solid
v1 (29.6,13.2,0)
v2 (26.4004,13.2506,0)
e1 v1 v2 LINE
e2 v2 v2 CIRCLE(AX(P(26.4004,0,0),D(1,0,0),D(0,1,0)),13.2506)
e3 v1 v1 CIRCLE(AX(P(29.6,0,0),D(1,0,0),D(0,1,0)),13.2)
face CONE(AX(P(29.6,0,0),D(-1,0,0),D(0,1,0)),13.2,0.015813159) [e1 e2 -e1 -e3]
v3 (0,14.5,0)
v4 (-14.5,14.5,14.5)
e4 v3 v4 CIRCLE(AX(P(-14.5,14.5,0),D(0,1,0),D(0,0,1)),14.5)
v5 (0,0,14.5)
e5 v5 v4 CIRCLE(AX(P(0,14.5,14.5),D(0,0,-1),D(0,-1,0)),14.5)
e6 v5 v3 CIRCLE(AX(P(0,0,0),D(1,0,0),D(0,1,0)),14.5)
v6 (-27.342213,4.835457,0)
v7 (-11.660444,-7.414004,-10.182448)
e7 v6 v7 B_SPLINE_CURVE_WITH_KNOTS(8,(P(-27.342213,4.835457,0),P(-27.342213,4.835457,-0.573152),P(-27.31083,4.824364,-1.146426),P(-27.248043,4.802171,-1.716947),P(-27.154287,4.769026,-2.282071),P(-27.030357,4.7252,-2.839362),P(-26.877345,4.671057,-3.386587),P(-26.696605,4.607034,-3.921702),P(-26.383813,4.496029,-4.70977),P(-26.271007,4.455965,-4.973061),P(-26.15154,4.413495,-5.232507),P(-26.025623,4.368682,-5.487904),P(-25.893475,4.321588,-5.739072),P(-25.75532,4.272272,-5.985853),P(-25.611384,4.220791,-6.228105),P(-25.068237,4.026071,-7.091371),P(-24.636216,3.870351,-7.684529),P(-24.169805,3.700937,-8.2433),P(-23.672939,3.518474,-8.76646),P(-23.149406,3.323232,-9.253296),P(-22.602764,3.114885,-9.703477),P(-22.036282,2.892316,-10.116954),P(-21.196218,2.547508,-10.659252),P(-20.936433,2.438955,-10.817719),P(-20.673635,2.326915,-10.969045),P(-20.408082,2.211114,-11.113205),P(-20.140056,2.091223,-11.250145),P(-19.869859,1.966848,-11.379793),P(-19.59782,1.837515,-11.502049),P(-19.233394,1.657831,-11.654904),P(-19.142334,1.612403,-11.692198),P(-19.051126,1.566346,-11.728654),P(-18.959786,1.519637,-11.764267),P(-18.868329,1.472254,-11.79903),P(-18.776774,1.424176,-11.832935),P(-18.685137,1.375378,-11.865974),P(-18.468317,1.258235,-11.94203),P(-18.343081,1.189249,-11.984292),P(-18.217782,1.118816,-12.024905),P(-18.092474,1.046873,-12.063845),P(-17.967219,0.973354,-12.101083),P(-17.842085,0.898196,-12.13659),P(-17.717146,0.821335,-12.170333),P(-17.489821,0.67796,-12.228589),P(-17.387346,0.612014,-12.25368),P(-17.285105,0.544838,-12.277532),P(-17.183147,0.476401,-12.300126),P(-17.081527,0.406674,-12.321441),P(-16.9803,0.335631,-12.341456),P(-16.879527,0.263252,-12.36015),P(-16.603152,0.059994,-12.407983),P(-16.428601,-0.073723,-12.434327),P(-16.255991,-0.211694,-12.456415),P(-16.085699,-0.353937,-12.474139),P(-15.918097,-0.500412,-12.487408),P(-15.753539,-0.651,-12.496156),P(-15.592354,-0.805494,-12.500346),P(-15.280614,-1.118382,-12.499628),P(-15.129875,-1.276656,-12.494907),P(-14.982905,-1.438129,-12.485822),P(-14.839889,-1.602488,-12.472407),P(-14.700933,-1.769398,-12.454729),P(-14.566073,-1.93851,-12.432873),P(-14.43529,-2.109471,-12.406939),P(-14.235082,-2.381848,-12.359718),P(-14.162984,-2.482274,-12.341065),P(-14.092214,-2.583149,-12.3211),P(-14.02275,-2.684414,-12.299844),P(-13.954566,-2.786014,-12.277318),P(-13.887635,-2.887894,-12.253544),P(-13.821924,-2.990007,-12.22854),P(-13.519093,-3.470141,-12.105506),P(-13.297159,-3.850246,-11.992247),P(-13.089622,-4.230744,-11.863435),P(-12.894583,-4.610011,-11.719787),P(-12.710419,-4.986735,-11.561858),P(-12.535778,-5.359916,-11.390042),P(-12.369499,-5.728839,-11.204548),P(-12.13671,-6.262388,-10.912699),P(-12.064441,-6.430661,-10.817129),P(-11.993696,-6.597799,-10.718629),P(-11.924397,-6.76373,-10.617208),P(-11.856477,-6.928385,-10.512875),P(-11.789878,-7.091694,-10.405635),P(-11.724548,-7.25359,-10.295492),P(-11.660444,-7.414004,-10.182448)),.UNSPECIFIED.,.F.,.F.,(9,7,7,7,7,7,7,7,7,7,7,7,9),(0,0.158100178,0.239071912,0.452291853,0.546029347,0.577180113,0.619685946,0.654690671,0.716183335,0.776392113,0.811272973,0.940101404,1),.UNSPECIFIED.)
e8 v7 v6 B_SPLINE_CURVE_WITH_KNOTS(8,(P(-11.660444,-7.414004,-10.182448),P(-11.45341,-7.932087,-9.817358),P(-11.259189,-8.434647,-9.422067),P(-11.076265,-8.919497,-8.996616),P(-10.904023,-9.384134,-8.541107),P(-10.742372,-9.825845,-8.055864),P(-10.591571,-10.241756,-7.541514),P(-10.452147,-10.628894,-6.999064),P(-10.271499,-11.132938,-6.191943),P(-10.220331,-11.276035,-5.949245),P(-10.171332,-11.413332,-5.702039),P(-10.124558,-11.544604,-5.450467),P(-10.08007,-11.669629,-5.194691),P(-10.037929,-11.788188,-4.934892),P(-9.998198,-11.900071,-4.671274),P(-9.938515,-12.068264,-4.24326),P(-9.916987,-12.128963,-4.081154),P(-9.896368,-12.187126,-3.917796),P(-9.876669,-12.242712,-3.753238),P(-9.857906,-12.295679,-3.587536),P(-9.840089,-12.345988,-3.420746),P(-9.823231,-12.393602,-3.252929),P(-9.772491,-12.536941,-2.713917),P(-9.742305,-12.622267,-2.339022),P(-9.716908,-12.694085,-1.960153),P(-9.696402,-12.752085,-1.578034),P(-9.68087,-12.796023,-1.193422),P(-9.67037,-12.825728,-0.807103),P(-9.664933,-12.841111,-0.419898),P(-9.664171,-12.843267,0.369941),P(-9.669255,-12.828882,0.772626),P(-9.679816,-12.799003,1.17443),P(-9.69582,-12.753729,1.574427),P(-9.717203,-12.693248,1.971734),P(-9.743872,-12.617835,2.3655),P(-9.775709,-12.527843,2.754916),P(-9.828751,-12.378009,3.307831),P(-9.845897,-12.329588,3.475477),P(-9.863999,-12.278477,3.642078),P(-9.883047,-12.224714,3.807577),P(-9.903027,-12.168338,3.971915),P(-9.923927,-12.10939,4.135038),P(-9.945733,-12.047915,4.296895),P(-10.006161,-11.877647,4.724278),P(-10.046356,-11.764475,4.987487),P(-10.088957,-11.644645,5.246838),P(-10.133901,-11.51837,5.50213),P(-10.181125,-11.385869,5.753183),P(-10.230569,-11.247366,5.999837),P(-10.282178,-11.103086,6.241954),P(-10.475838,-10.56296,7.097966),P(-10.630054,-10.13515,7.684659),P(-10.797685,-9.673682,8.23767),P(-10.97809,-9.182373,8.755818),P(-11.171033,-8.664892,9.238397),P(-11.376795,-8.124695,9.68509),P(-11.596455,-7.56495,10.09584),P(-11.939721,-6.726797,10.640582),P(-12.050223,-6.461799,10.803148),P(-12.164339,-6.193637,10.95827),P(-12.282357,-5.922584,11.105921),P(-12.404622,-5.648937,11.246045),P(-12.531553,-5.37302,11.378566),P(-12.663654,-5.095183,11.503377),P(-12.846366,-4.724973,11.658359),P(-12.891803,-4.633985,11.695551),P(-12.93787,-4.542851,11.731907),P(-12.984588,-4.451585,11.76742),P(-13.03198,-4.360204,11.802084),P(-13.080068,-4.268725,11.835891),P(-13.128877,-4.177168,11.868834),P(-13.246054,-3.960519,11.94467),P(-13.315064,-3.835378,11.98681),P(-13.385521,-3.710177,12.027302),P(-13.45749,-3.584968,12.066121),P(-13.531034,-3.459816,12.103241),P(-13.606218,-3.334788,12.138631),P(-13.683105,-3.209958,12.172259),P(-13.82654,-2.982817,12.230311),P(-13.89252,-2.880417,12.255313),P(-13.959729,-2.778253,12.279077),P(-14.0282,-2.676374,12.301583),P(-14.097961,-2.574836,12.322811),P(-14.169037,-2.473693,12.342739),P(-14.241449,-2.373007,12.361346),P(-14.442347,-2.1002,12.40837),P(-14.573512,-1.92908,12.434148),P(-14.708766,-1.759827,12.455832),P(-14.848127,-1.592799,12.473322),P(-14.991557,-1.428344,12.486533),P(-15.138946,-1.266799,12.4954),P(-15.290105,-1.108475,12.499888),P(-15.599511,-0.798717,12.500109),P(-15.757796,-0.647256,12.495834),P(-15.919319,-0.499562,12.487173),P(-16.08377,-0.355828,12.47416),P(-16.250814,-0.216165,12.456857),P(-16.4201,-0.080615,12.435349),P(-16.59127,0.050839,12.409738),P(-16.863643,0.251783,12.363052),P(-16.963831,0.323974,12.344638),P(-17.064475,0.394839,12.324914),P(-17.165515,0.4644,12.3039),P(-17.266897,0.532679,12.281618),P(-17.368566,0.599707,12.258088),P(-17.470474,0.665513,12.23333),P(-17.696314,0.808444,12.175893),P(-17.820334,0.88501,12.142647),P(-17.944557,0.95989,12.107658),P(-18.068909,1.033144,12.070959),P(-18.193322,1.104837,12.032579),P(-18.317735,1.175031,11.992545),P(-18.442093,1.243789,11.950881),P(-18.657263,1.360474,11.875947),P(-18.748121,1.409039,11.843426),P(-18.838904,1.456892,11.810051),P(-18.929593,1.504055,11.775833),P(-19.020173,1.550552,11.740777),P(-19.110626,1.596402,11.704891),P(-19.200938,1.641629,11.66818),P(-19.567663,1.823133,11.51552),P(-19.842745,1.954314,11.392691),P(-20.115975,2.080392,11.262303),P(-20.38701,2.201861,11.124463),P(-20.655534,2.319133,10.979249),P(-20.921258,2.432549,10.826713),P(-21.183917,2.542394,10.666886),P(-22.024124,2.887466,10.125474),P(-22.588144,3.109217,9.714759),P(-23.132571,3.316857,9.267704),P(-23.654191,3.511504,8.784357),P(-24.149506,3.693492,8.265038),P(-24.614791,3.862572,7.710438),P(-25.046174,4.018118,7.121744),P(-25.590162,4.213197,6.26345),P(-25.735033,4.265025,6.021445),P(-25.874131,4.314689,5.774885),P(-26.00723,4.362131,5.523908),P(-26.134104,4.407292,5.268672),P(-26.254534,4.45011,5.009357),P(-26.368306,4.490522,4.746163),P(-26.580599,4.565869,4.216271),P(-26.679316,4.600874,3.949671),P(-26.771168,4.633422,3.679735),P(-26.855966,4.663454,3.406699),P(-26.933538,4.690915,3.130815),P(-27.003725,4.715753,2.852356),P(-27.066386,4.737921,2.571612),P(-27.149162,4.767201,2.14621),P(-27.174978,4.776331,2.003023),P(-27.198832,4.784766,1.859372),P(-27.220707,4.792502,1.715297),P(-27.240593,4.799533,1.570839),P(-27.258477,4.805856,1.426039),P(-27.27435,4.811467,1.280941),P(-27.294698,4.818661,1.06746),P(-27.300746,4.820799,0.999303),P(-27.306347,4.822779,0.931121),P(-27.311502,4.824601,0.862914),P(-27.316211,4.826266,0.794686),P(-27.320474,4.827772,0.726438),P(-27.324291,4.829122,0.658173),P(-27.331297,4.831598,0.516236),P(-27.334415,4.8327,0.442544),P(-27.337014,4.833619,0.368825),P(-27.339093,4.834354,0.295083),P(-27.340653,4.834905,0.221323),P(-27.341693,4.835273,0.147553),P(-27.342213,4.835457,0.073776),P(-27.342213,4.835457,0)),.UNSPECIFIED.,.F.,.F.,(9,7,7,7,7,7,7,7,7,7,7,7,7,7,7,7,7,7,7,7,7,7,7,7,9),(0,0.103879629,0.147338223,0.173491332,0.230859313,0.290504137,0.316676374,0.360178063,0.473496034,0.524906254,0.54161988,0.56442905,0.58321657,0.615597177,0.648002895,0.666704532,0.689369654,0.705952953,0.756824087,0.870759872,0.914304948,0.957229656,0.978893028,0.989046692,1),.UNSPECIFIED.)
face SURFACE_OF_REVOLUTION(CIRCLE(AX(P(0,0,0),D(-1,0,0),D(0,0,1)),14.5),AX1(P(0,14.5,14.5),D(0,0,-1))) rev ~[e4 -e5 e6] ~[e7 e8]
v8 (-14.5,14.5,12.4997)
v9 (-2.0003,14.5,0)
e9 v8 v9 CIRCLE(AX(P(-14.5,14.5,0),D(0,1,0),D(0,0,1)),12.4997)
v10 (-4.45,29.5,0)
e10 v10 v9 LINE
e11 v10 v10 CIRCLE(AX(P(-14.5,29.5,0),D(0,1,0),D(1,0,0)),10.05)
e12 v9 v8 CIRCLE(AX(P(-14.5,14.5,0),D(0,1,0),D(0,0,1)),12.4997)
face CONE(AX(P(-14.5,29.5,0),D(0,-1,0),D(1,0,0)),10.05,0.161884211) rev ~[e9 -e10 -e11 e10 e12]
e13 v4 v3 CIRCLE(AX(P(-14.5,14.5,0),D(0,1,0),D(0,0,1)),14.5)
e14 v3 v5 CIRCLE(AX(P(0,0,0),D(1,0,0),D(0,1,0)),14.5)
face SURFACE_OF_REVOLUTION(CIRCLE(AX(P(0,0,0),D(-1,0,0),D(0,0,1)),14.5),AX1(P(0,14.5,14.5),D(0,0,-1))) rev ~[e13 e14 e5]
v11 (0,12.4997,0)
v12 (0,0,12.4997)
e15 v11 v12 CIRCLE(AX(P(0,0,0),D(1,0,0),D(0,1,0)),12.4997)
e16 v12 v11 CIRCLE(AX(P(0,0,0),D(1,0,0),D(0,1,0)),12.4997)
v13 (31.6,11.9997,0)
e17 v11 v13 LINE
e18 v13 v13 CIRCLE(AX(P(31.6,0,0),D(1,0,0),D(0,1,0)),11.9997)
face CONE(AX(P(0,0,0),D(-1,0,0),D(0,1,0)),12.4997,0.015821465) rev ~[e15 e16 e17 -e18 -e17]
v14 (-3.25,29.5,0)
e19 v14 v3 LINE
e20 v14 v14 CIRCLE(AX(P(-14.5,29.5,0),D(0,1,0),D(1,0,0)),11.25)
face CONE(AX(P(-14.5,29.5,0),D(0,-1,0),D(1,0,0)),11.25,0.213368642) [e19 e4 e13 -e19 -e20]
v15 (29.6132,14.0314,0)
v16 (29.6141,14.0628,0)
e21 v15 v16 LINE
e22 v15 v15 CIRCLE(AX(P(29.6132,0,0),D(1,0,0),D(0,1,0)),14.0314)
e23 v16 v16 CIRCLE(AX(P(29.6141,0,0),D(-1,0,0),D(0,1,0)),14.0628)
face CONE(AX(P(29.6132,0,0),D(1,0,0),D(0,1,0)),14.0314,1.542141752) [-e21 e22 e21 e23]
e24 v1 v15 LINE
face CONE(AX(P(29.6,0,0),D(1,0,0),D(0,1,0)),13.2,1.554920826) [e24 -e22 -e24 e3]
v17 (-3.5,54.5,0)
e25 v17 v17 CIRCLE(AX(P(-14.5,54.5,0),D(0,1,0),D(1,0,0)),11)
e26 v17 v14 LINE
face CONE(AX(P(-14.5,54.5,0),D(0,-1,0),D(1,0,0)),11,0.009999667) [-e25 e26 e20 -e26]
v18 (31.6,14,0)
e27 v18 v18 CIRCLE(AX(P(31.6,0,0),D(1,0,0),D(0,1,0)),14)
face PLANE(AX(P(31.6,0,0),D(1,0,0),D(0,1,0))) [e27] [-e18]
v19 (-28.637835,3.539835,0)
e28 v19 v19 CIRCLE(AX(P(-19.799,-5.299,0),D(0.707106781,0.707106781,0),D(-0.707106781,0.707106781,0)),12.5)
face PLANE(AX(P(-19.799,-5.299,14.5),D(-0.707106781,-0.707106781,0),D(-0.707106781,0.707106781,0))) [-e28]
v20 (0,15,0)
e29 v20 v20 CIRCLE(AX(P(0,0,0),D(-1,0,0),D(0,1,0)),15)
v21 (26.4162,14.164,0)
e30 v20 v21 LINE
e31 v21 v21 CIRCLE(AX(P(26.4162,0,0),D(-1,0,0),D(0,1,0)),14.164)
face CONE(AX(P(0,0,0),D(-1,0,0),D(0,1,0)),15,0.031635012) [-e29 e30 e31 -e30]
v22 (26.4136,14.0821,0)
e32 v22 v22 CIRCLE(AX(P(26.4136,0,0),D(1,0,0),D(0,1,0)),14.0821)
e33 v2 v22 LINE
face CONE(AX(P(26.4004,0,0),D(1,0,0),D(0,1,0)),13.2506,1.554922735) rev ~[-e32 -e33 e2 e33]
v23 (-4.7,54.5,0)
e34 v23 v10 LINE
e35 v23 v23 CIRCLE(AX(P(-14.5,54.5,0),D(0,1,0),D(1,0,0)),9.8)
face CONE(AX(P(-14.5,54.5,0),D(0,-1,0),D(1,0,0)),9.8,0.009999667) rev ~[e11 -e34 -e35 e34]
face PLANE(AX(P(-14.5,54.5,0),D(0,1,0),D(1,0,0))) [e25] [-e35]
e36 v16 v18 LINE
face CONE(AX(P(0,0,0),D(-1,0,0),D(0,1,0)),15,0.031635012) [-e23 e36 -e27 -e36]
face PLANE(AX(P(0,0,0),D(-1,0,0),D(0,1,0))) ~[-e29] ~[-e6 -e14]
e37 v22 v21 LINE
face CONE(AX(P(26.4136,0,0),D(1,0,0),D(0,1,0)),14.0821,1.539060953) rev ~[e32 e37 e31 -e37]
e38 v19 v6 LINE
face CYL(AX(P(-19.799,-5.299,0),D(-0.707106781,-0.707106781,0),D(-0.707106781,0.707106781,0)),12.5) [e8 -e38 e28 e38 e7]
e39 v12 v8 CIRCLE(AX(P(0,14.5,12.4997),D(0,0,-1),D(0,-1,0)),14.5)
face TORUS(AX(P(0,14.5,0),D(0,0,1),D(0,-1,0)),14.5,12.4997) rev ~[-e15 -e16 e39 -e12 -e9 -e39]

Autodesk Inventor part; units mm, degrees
ref_plane "YZ Plane" through (0, 0, 0) normal (1, 0, 0) x (0, 1, 0)
sketch "Sketch1" plane through (0, 0, 0) normal (0, 0, 1) x (1, 0, 0)
  line L0 (0, 0) -> (0, 14.5) construction
  line L1 (0, 0) -> (31.6, 0) construction
  line L2 (31.6, 0) -> (31.6, 14) construction
  line L3 (0, 12.4997) -> (31.6, 11.9997)
  line L4 (0, 12.4997) -> (0, 14.5)
  line L5 (31.6, 14) -> (31.6, 11.9997)
  line L6 (29.6, 0) -> (29.6, 13.2) construction
  line L7 (29.6, 13.2) -> (29.6132, 14.0314)
  line L8 (29.6, 13.2) -> (26.4004, 13.2506)
  line L9 (26.4004, 13.2506) -> (26.4136, 14.0821)
  line L10 (31.6, 14) -> (29.6132, 14.0314)
  line L11 (26.4136, 14.0821) -> (0, 14.5)
  dimension "d0" = 14.5
  dimension "d1" = 31.6
  dimension "d2" = 14
  dimension "d4" = 13.2
  dimension "d5" = 2
  dimension "d6" = 3.2
  dimension "d22" = 2
revolve "Revolution1" add sketch "Sketch1" angle 360 about axis through (0, 0, 0) along (1, 0, 0)
ref_plane "Work Plane1" through (0, 14.5, 0) normal (0, 1, 0) x (-1, 0, 0)
sketch "Sketch2" plane through (0, 14.5, 0) normal (0, 1, 0) x (-1, 0, 0)
  line L0 (0, 14.5) -> (0, -14.5) construction
  line L1 (0, 14.5) -> (0, -14.5) construction
  point P0 (0, 0)
sketch "Sketch3" plane through (0, 0, 0) normal (-1, 0, 0) x (0, 0, 1)
  circle A0 centre (0, 0) radius 14.5 projected
  circle A1 centre (0, 0) radius 12.4997 projected
revolve "Revolution2" add sketch "Sketch3" angle 90 about axis through (0, 14.5, 14.5) along (0, 0, -1)
sketch "Sketch4" plane through (0, 0, 0) normal (0, 0, 1) x (1, 0, 0)
  line L0 (0, 14.5) -> (-29, 14.5) construction
  line L1 (-14.5, 14.5) -> (0, 14.5) construction
  line L2 (0, 14.5) -> (26.4136, 14.0821) construction
  line L3 (-14.5, 14.5) -> (-14.5, 29.5) construction
  line L4 (-14.5, 29.5) -> (-3.25, 29.5) construction
  line L5 (-3.25, 29.5) -> (0, 14.5)
  line L6 (-14.5, 29.5) -> (-14.5, 54.5) construction
  line L7 (-14.5, 54.5) -> (-3.5, 54.5) construction
  line L8 (-3.5, 54.5) -> (-3.25, 29.5)
  line L9 (-3.5, 54.5) -> (-4.7, 54.5)
  line L10 (-4.7, 54.5) -> (-4.45, 29.5)
  line L11 (-4.45, 29.5) -> (-2.0003, 14.5)
  line L12 (-2.0003, 14.5) -> (0, 14.5)
  line L13 (-26.9997, 14.5) -> (-2.0003, 14.5) projected
  point P0 (0, 0)
  dimension "d10" = 15
  dimension "d11" = 11.25
  dimension "d12" = 25
  dimension "d13" = 11
  dimension "d14" = 1.2
  dimension "d15" = 1.2
revolve "Revolution3" add sketch "Sketch4" angle 360 about axis through (-14.5, 29.5, 0) along (0, 1, 0)
ref_plane "Work Plane3" through (-19.799, -5.299, 14.5) normal (-0.7071068, -0.7071068, 0) x (0, 0, -1)
ref_plane "Work Plane2" through (0, 14.5, 14.5) normal (-0.7071068, -0.7071068, 0) x (0, 0, -1)
sketch "Sketch5" plane through (-19.799, -5.299, 14.5) normal (-0.7071068, -0.7071068, 0) x (0, 0, -1)
  circle A0 centre (14.5, 0) radius 14.5
  point P0 (14.5, 10.253)
extrude "Extrusion1" cut sketch "Sketch5" along normal blind 10
sketch "Sketch6" plane through (-19.799, -5.299, 14.5) normal (-0.7071068, -0.7071068, 0) x (-0.7071068, 0.7071068, 0)
  ellipse E0 centre (-10.253, 14.5) end of major axis (-10.253, 29) minor radius 10.253 projected
  circle A0 centre (0, 14.5) radius 12.5
  dimension "d23" = 25
extrude "Extrusion2" add sketch "Sketch6" against normal up to next contours A0 E0 | E0 A0 picked at (-4.1364, 16.63) picked at (3.9536, 16.6096)
sketch "Sketch7" plane through (0, 0, 0) normal (0, 0, 1) x (1, 0, 0)
  line L0 (0, 0) -> (0, 15) construction
  line L1 (0, -14.5) -> (0, 14.5) projected
  line L2 (0, 14.5) -> (0, 15)
  line L3 (31.6, -14) -> (31.6, 14) projected
  line L4 (0, 15) -> (31.6, 14)
  line L5 (26.4136, -14.0821) -> (26.4136, 14.0821) projected
  line L6 (26.4136, 14.0821) -> (26.4162, 14.164)
  line L7 (29.6132, -14.0314) -> (29.6132, 14.0314) projected
  line L8 (29.6132, 14.0314) -> (29.6141, 14.0628)
  line L9 (0, 14.5) -> (26.4136, 14.0821)
  line L10 (29.6132, 14.0314) -> (31.6, 14)
  line L11 (31.6, -11.9997) -> (31.6, 11.9997) projected
  line L12 (31.6, 0) -> (0, 0)
  dimension "d26" = 15
revolve "Revolution4" add sketch "Sketch7" angle 360 about axis through (31.6, 0, 0) along (-1, 0, 0) contours L2 L4 L6 L9 | L8 L4 L10
properties part number "90DegreeV3"
